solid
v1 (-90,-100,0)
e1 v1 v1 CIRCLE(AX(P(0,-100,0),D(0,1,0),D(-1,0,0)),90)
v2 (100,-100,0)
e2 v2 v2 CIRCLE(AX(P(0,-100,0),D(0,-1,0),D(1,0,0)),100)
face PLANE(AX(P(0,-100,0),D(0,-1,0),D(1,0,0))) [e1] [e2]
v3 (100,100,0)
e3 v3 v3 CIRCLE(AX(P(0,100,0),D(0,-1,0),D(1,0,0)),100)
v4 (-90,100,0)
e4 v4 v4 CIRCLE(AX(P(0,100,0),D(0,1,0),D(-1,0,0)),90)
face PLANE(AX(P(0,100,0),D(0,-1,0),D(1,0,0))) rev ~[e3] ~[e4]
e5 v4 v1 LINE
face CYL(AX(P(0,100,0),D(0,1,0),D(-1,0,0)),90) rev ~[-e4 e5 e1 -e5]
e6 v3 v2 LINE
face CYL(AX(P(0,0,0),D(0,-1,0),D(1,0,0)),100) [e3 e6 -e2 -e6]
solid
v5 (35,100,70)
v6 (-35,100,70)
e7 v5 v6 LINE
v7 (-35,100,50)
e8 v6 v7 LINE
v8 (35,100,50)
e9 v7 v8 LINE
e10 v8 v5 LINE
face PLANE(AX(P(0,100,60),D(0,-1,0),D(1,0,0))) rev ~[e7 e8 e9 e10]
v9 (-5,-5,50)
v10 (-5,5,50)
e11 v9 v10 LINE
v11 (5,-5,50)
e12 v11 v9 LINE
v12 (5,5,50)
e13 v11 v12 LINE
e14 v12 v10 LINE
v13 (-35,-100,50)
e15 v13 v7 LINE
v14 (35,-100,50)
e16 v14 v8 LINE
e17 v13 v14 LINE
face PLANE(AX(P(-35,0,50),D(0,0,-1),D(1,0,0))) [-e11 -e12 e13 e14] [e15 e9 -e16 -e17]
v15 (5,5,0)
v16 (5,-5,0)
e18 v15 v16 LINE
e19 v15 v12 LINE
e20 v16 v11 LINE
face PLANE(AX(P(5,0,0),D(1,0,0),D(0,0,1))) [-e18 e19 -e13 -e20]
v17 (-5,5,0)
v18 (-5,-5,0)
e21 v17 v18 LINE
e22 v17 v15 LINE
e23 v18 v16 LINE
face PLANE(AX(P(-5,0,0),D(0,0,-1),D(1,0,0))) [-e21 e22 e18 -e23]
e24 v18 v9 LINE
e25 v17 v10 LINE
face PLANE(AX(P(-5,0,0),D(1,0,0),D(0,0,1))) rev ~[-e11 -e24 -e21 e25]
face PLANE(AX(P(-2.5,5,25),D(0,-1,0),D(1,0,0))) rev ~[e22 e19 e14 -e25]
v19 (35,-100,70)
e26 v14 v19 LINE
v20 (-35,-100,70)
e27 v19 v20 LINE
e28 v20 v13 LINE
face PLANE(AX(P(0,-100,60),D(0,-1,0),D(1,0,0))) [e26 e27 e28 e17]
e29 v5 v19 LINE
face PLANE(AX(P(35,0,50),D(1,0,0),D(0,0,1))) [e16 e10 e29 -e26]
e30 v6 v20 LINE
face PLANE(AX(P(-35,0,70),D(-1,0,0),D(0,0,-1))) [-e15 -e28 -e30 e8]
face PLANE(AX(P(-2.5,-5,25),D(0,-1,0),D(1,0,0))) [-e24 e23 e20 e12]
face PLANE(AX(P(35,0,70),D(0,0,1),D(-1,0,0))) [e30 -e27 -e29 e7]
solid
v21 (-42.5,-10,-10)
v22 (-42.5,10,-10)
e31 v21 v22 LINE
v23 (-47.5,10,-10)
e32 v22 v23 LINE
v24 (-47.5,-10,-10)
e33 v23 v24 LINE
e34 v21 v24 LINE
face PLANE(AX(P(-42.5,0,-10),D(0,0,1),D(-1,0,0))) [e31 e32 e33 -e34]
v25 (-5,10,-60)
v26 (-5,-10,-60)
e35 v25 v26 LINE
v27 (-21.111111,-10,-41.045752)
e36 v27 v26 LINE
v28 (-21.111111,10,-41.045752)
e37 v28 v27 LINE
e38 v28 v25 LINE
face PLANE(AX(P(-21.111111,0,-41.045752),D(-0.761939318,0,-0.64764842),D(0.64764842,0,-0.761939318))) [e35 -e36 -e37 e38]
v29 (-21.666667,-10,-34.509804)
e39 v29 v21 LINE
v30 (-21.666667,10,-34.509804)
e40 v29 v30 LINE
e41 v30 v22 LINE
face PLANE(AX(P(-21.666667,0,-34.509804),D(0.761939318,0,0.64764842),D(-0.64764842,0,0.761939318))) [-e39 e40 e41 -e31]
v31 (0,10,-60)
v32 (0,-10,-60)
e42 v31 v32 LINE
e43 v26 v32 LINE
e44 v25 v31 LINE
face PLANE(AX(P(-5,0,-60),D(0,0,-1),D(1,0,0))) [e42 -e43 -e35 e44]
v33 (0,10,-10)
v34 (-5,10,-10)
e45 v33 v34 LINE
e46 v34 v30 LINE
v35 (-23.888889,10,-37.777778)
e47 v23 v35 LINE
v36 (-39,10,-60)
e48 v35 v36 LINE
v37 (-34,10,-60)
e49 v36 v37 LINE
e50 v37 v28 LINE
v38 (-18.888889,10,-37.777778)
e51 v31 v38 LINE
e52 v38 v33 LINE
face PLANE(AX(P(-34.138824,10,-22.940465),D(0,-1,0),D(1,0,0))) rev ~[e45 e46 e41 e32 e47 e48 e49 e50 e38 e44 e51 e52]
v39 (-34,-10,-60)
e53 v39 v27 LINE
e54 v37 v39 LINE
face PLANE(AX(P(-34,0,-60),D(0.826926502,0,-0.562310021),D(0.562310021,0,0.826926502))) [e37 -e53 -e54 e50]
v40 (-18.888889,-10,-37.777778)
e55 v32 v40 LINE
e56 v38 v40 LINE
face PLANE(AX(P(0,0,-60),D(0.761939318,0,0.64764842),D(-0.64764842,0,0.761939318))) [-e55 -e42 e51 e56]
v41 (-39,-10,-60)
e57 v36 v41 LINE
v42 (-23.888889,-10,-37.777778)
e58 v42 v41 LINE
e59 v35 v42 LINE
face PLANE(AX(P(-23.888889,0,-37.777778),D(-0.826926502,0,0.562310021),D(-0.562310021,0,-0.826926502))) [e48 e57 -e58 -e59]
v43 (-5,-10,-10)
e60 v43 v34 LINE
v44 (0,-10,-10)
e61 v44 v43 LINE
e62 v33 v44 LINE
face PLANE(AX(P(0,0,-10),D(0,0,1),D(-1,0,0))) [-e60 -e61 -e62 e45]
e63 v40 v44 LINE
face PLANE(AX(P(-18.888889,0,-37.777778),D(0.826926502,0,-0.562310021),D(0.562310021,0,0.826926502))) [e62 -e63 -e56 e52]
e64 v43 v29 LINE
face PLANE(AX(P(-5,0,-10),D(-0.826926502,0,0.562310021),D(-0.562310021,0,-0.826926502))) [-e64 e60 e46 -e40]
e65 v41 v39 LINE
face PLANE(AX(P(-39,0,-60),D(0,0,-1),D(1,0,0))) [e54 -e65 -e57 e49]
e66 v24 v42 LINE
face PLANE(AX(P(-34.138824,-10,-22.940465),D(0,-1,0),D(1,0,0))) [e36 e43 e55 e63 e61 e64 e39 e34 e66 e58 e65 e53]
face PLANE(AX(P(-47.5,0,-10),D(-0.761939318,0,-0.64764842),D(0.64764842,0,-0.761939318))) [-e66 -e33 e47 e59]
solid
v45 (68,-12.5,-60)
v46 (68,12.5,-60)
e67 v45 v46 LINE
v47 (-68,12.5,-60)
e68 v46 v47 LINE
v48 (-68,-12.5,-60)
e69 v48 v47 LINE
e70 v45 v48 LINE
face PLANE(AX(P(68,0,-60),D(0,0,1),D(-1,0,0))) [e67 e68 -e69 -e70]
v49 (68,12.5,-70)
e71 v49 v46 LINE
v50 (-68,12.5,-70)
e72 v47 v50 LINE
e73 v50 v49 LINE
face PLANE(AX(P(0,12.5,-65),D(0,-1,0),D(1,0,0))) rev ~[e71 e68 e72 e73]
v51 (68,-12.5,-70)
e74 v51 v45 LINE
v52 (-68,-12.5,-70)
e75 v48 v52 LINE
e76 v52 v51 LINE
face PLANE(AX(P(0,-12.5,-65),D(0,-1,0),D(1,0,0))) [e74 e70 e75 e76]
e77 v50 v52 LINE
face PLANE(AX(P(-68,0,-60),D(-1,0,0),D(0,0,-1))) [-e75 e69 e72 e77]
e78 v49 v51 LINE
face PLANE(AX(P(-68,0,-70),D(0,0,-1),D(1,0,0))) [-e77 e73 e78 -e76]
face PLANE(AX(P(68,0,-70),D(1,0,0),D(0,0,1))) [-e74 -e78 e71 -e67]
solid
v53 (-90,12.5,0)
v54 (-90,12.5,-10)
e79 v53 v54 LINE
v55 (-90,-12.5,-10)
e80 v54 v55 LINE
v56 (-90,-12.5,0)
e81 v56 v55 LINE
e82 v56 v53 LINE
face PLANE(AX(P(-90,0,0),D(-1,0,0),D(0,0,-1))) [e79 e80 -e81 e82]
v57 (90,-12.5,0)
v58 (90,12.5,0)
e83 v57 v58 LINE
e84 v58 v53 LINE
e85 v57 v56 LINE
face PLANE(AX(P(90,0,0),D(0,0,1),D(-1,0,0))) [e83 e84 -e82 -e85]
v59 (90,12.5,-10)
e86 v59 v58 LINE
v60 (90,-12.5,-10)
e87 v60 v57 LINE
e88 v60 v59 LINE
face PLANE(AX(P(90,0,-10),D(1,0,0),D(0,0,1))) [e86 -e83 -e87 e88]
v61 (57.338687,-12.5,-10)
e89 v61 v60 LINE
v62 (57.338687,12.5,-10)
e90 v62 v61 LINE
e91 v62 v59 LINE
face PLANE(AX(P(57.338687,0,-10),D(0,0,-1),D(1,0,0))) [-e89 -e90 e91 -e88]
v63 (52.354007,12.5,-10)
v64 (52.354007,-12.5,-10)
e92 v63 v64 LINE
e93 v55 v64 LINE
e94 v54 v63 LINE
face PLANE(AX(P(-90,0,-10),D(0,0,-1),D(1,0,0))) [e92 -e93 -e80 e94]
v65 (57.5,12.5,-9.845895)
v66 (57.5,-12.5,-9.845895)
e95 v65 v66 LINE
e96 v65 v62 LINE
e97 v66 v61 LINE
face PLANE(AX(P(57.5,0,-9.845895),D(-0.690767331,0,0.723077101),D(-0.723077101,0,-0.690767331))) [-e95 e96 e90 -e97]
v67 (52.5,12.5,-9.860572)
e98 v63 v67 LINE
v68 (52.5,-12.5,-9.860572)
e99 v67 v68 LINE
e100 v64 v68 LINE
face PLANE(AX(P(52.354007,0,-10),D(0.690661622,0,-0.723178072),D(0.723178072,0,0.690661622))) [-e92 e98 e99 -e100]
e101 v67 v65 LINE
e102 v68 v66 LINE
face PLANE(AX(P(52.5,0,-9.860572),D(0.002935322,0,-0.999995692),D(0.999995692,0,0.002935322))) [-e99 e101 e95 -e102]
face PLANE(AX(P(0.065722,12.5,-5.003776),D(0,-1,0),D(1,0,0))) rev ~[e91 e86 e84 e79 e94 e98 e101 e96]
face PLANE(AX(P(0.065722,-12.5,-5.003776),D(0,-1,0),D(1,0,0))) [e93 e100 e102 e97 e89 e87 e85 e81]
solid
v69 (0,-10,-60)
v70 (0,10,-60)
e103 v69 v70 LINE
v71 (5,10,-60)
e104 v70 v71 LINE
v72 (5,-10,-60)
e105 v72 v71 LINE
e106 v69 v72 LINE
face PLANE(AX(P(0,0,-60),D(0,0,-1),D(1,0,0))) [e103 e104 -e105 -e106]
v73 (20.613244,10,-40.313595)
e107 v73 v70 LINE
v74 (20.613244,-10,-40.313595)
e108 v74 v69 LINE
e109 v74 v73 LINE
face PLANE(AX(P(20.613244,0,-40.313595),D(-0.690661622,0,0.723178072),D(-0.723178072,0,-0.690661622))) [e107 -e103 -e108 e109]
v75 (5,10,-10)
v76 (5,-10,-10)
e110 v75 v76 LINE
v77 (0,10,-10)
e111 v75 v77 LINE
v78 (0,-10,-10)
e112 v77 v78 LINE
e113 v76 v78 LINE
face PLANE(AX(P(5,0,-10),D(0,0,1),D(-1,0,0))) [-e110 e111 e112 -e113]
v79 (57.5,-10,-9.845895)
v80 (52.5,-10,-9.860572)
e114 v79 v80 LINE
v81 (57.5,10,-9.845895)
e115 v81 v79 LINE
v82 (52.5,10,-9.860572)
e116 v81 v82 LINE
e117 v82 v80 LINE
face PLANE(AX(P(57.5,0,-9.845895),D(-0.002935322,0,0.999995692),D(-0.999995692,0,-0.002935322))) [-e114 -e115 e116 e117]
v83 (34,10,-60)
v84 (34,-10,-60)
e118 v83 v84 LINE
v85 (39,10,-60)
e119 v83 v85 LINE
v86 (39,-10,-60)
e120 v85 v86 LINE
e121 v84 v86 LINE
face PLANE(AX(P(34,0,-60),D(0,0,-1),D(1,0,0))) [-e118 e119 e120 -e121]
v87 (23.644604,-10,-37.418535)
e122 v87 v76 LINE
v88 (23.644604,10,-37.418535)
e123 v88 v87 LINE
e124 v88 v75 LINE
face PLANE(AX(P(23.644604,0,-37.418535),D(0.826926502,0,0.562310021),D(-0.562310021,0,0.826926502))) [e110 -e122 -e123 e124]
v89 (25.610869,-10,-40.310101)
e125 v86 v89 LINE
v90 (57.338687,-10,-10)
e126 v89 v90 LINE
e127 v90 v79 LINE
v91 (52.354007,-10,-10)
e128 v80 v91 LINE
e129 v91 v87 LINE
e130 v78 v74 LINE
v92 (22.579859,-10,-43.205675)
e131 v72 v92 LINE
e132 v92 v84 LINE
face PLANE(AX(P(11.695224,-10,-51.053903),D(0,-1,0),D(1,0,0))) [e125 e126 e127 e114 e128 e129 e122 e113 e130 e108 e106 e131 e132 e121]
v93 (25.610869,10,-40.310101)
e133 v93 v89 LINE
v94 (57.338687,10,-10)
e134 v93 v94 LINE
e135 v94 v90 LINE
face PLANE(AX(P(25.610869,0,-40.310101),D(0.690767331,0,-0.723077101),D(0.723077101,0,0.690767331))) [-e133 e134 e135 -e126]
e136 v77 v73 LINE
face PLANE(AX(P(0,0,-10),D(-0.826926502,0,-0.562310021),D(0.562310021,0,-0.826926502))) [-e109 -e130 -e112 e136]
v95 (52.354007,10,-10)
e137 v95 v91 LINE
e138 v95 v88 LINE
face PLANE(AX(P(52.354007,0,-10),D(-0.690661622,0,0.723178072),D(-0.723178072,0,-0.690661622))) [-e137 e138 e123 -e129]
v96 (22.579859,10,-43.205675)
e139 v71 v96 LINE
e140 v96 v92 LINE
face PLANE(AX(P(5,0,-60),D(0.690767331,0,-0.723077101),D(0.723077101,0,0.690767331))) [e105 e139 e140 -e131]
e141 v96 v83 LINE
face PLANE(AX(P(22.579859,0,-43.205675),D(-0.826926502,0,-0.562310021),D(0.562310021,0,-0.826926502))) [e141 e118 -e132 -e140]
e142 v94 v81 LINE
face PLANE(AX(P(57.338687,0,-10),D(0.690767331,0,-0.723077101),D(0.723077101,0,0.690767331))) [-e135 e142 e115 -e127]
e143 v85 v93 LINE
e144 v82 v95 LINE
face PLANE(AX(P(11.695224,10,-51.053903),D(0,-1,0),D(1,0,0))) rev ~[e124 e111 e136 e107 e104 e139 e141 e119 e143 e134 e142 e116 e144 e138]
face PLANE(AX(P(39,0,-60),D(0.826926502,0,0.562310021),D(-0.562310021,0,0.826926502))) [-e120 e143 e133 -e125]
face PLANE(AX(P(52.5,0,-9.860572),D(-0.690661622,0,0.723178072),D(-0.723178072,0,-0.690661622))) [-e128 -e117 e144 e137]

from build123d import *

# Parameters (mm, degrees)
F0_R     = 100
F1_DEPTH = 100
F2_R     = 90
F3_DEPTH = 200
F5_DEPTH = 100
F4_W     = 4.9999998882
F4_H     = 50
F4_W_2   = 5
F6_DEPTH = 5
F7_DEPTH = 12.5
F8_DEPTH = 10


# Not quite as in the source:
# - a feature names something its author has since deleted; it is built from what else it names


with BuildPart() as f1:
    # F0 (on Front) → F1 (new body, symmetric)
    with BuildSketch(Plane.XZ):
        Circle(F0_R)
    extrude(amount=F1_DEPTH, both=True)

    # F2 (on face) → F3 (cut)
    with BuildSketch(Plane(origin=(0, 100, 0), x_dir=(-1, 0, 0), z_dir=(0, 1, 0))):
        Circle(F2_R)
    extrude(amount=-F3_DEPTH, mode=Mode.SUBTRACT)


with BuildPart() as f5:
    # F4 (on Front) → F5 (new body, symmetric)
    with BuildSketch(Plane.XZ):
        Polygon((-4.9999998882, 50), (0, 50), (5, 50), (35, 50), (35, 70), (-35, 70), (-35, 50), align=None)
    extrude(amount=F5_DEPTH, both=True)

    # F4 (on Front) → F6 (join, symmetric)
    with BuildSketch(Plane.XZ):
        with Locations((-2.4999999441, 25)):
            Rectangle(F4_W, F4_H)
        with Locations((2.5, 25)):
            Rectangle(F4_W_2, F4_H)
    extrude(amount=F6_DEPTH, both=True)


with BuildPart() as f7:
    # F4 (on Front) → F7 (new body, symmetric)
    with BuildSketch(Plane.XZ):
        Polygon((5, 0), (0, 0), (-4.9999998882, 0), (-90, 0), (-90, -10), (-47.5, -10), (-42.5, -10), (-40.6034433022, -10), (-5, -10), (0, -10), (5, -10), (52.3540072756, -10), (52.5, -9.8605715856), (57.5, -9.8458949104), (57.3386868395, -10), (90, -10), (90, 0), (45, 0), align=None)
    extrude(amount=F7_DEPTH, both=True)


with BuildPart() as f7b:
    # F4 (on Front) → F7, piece 2 (new body, symmetric)
    with BuildSketch(Plane.XZ):
        Polygon((-34, -60), (-39, -60), (-64.5170719501, -60), (-68, -60), (-68, -70), (0, -70), (68, -70), (68, -60), (39, -60), (34, -60), (5, -60), (0, -60), (-5, -60), align=None)
    extrude(amount=F7_DEPTH, both=True)


with BuildPart() as f8:
    # F4 (on Front) → F8 (new body, symmetric)
    with BuildSketch(Plane.XZ):
        Polygon((-42.5, -10), (-47.5, -10), (-23.8888888889, -37.7777777778), (-21.6666666667, -34.5098039216), align=None)
        Polygon((-21.1111111111, -41.045751634), (-23.8888888889, -37.7777777778), (-39, -60), (-34, -60), align=None)
        Polygon((-21.6666666667, -34.5098039216), (-23.8888888889, -37.7777777778), (-21.1111111111, -41.045751634), (-18.8888888889, -37.7777777778), align=None)
        Polygon((-5, -10), (-21.6666666667, -34.5098039216), (-18.8888888889, -37.7777777778), (0, -10), align=None)
        Polygon((-18.8888888889, -37.7777777778), (-21.1111111111, -41.045751634), (-5, -60), (0, -60), align=None)
    extrude(amount=F8_DEPTH, both=True)


with BuildPart() as f8b:
    # F4 (on Front) → F8, piece 2 (new body, symmetric)
    with BuildSketch(Plane.XZ):
        Polygon((5, -60), (22.579858739, -43.2056746161), (20.6132442897, -40.3135945437), (0, -60), align=None)
        Polygon((22.579858739, -43.2056746161), (25.6108688664, -40.3101012741), (23.6446037441, -37.4185349178), (20.6132442897, -40.3135945437), align=None)
        Polygon((39, -60), (25.6108688664, -40.3101012741), (22.579858739, -43.2056746161), (34, -60), align=None)
        Polygon((52.3540072756, -10), (57.3386868395, -10), (57.5, -9.8458949104), (52.5, -9.8605715856), align=None)
        Polygon((20.6132442897, -40.3135945437), (23.6446037441, -37.4185349178), (5, -10), (0, -10), align=None)
        Polygon((25.6108688664, -40.3101012741), (57.3386868395, -10), (52.3540072756, -10), (23.6446037441, -37.4185349178), align=None)
    extrude(amount=F8_DEPTH, both=True)


solid = Compound([f1.part, f5.part, f7.part, f7b.part, f8.part, f8b.part])
